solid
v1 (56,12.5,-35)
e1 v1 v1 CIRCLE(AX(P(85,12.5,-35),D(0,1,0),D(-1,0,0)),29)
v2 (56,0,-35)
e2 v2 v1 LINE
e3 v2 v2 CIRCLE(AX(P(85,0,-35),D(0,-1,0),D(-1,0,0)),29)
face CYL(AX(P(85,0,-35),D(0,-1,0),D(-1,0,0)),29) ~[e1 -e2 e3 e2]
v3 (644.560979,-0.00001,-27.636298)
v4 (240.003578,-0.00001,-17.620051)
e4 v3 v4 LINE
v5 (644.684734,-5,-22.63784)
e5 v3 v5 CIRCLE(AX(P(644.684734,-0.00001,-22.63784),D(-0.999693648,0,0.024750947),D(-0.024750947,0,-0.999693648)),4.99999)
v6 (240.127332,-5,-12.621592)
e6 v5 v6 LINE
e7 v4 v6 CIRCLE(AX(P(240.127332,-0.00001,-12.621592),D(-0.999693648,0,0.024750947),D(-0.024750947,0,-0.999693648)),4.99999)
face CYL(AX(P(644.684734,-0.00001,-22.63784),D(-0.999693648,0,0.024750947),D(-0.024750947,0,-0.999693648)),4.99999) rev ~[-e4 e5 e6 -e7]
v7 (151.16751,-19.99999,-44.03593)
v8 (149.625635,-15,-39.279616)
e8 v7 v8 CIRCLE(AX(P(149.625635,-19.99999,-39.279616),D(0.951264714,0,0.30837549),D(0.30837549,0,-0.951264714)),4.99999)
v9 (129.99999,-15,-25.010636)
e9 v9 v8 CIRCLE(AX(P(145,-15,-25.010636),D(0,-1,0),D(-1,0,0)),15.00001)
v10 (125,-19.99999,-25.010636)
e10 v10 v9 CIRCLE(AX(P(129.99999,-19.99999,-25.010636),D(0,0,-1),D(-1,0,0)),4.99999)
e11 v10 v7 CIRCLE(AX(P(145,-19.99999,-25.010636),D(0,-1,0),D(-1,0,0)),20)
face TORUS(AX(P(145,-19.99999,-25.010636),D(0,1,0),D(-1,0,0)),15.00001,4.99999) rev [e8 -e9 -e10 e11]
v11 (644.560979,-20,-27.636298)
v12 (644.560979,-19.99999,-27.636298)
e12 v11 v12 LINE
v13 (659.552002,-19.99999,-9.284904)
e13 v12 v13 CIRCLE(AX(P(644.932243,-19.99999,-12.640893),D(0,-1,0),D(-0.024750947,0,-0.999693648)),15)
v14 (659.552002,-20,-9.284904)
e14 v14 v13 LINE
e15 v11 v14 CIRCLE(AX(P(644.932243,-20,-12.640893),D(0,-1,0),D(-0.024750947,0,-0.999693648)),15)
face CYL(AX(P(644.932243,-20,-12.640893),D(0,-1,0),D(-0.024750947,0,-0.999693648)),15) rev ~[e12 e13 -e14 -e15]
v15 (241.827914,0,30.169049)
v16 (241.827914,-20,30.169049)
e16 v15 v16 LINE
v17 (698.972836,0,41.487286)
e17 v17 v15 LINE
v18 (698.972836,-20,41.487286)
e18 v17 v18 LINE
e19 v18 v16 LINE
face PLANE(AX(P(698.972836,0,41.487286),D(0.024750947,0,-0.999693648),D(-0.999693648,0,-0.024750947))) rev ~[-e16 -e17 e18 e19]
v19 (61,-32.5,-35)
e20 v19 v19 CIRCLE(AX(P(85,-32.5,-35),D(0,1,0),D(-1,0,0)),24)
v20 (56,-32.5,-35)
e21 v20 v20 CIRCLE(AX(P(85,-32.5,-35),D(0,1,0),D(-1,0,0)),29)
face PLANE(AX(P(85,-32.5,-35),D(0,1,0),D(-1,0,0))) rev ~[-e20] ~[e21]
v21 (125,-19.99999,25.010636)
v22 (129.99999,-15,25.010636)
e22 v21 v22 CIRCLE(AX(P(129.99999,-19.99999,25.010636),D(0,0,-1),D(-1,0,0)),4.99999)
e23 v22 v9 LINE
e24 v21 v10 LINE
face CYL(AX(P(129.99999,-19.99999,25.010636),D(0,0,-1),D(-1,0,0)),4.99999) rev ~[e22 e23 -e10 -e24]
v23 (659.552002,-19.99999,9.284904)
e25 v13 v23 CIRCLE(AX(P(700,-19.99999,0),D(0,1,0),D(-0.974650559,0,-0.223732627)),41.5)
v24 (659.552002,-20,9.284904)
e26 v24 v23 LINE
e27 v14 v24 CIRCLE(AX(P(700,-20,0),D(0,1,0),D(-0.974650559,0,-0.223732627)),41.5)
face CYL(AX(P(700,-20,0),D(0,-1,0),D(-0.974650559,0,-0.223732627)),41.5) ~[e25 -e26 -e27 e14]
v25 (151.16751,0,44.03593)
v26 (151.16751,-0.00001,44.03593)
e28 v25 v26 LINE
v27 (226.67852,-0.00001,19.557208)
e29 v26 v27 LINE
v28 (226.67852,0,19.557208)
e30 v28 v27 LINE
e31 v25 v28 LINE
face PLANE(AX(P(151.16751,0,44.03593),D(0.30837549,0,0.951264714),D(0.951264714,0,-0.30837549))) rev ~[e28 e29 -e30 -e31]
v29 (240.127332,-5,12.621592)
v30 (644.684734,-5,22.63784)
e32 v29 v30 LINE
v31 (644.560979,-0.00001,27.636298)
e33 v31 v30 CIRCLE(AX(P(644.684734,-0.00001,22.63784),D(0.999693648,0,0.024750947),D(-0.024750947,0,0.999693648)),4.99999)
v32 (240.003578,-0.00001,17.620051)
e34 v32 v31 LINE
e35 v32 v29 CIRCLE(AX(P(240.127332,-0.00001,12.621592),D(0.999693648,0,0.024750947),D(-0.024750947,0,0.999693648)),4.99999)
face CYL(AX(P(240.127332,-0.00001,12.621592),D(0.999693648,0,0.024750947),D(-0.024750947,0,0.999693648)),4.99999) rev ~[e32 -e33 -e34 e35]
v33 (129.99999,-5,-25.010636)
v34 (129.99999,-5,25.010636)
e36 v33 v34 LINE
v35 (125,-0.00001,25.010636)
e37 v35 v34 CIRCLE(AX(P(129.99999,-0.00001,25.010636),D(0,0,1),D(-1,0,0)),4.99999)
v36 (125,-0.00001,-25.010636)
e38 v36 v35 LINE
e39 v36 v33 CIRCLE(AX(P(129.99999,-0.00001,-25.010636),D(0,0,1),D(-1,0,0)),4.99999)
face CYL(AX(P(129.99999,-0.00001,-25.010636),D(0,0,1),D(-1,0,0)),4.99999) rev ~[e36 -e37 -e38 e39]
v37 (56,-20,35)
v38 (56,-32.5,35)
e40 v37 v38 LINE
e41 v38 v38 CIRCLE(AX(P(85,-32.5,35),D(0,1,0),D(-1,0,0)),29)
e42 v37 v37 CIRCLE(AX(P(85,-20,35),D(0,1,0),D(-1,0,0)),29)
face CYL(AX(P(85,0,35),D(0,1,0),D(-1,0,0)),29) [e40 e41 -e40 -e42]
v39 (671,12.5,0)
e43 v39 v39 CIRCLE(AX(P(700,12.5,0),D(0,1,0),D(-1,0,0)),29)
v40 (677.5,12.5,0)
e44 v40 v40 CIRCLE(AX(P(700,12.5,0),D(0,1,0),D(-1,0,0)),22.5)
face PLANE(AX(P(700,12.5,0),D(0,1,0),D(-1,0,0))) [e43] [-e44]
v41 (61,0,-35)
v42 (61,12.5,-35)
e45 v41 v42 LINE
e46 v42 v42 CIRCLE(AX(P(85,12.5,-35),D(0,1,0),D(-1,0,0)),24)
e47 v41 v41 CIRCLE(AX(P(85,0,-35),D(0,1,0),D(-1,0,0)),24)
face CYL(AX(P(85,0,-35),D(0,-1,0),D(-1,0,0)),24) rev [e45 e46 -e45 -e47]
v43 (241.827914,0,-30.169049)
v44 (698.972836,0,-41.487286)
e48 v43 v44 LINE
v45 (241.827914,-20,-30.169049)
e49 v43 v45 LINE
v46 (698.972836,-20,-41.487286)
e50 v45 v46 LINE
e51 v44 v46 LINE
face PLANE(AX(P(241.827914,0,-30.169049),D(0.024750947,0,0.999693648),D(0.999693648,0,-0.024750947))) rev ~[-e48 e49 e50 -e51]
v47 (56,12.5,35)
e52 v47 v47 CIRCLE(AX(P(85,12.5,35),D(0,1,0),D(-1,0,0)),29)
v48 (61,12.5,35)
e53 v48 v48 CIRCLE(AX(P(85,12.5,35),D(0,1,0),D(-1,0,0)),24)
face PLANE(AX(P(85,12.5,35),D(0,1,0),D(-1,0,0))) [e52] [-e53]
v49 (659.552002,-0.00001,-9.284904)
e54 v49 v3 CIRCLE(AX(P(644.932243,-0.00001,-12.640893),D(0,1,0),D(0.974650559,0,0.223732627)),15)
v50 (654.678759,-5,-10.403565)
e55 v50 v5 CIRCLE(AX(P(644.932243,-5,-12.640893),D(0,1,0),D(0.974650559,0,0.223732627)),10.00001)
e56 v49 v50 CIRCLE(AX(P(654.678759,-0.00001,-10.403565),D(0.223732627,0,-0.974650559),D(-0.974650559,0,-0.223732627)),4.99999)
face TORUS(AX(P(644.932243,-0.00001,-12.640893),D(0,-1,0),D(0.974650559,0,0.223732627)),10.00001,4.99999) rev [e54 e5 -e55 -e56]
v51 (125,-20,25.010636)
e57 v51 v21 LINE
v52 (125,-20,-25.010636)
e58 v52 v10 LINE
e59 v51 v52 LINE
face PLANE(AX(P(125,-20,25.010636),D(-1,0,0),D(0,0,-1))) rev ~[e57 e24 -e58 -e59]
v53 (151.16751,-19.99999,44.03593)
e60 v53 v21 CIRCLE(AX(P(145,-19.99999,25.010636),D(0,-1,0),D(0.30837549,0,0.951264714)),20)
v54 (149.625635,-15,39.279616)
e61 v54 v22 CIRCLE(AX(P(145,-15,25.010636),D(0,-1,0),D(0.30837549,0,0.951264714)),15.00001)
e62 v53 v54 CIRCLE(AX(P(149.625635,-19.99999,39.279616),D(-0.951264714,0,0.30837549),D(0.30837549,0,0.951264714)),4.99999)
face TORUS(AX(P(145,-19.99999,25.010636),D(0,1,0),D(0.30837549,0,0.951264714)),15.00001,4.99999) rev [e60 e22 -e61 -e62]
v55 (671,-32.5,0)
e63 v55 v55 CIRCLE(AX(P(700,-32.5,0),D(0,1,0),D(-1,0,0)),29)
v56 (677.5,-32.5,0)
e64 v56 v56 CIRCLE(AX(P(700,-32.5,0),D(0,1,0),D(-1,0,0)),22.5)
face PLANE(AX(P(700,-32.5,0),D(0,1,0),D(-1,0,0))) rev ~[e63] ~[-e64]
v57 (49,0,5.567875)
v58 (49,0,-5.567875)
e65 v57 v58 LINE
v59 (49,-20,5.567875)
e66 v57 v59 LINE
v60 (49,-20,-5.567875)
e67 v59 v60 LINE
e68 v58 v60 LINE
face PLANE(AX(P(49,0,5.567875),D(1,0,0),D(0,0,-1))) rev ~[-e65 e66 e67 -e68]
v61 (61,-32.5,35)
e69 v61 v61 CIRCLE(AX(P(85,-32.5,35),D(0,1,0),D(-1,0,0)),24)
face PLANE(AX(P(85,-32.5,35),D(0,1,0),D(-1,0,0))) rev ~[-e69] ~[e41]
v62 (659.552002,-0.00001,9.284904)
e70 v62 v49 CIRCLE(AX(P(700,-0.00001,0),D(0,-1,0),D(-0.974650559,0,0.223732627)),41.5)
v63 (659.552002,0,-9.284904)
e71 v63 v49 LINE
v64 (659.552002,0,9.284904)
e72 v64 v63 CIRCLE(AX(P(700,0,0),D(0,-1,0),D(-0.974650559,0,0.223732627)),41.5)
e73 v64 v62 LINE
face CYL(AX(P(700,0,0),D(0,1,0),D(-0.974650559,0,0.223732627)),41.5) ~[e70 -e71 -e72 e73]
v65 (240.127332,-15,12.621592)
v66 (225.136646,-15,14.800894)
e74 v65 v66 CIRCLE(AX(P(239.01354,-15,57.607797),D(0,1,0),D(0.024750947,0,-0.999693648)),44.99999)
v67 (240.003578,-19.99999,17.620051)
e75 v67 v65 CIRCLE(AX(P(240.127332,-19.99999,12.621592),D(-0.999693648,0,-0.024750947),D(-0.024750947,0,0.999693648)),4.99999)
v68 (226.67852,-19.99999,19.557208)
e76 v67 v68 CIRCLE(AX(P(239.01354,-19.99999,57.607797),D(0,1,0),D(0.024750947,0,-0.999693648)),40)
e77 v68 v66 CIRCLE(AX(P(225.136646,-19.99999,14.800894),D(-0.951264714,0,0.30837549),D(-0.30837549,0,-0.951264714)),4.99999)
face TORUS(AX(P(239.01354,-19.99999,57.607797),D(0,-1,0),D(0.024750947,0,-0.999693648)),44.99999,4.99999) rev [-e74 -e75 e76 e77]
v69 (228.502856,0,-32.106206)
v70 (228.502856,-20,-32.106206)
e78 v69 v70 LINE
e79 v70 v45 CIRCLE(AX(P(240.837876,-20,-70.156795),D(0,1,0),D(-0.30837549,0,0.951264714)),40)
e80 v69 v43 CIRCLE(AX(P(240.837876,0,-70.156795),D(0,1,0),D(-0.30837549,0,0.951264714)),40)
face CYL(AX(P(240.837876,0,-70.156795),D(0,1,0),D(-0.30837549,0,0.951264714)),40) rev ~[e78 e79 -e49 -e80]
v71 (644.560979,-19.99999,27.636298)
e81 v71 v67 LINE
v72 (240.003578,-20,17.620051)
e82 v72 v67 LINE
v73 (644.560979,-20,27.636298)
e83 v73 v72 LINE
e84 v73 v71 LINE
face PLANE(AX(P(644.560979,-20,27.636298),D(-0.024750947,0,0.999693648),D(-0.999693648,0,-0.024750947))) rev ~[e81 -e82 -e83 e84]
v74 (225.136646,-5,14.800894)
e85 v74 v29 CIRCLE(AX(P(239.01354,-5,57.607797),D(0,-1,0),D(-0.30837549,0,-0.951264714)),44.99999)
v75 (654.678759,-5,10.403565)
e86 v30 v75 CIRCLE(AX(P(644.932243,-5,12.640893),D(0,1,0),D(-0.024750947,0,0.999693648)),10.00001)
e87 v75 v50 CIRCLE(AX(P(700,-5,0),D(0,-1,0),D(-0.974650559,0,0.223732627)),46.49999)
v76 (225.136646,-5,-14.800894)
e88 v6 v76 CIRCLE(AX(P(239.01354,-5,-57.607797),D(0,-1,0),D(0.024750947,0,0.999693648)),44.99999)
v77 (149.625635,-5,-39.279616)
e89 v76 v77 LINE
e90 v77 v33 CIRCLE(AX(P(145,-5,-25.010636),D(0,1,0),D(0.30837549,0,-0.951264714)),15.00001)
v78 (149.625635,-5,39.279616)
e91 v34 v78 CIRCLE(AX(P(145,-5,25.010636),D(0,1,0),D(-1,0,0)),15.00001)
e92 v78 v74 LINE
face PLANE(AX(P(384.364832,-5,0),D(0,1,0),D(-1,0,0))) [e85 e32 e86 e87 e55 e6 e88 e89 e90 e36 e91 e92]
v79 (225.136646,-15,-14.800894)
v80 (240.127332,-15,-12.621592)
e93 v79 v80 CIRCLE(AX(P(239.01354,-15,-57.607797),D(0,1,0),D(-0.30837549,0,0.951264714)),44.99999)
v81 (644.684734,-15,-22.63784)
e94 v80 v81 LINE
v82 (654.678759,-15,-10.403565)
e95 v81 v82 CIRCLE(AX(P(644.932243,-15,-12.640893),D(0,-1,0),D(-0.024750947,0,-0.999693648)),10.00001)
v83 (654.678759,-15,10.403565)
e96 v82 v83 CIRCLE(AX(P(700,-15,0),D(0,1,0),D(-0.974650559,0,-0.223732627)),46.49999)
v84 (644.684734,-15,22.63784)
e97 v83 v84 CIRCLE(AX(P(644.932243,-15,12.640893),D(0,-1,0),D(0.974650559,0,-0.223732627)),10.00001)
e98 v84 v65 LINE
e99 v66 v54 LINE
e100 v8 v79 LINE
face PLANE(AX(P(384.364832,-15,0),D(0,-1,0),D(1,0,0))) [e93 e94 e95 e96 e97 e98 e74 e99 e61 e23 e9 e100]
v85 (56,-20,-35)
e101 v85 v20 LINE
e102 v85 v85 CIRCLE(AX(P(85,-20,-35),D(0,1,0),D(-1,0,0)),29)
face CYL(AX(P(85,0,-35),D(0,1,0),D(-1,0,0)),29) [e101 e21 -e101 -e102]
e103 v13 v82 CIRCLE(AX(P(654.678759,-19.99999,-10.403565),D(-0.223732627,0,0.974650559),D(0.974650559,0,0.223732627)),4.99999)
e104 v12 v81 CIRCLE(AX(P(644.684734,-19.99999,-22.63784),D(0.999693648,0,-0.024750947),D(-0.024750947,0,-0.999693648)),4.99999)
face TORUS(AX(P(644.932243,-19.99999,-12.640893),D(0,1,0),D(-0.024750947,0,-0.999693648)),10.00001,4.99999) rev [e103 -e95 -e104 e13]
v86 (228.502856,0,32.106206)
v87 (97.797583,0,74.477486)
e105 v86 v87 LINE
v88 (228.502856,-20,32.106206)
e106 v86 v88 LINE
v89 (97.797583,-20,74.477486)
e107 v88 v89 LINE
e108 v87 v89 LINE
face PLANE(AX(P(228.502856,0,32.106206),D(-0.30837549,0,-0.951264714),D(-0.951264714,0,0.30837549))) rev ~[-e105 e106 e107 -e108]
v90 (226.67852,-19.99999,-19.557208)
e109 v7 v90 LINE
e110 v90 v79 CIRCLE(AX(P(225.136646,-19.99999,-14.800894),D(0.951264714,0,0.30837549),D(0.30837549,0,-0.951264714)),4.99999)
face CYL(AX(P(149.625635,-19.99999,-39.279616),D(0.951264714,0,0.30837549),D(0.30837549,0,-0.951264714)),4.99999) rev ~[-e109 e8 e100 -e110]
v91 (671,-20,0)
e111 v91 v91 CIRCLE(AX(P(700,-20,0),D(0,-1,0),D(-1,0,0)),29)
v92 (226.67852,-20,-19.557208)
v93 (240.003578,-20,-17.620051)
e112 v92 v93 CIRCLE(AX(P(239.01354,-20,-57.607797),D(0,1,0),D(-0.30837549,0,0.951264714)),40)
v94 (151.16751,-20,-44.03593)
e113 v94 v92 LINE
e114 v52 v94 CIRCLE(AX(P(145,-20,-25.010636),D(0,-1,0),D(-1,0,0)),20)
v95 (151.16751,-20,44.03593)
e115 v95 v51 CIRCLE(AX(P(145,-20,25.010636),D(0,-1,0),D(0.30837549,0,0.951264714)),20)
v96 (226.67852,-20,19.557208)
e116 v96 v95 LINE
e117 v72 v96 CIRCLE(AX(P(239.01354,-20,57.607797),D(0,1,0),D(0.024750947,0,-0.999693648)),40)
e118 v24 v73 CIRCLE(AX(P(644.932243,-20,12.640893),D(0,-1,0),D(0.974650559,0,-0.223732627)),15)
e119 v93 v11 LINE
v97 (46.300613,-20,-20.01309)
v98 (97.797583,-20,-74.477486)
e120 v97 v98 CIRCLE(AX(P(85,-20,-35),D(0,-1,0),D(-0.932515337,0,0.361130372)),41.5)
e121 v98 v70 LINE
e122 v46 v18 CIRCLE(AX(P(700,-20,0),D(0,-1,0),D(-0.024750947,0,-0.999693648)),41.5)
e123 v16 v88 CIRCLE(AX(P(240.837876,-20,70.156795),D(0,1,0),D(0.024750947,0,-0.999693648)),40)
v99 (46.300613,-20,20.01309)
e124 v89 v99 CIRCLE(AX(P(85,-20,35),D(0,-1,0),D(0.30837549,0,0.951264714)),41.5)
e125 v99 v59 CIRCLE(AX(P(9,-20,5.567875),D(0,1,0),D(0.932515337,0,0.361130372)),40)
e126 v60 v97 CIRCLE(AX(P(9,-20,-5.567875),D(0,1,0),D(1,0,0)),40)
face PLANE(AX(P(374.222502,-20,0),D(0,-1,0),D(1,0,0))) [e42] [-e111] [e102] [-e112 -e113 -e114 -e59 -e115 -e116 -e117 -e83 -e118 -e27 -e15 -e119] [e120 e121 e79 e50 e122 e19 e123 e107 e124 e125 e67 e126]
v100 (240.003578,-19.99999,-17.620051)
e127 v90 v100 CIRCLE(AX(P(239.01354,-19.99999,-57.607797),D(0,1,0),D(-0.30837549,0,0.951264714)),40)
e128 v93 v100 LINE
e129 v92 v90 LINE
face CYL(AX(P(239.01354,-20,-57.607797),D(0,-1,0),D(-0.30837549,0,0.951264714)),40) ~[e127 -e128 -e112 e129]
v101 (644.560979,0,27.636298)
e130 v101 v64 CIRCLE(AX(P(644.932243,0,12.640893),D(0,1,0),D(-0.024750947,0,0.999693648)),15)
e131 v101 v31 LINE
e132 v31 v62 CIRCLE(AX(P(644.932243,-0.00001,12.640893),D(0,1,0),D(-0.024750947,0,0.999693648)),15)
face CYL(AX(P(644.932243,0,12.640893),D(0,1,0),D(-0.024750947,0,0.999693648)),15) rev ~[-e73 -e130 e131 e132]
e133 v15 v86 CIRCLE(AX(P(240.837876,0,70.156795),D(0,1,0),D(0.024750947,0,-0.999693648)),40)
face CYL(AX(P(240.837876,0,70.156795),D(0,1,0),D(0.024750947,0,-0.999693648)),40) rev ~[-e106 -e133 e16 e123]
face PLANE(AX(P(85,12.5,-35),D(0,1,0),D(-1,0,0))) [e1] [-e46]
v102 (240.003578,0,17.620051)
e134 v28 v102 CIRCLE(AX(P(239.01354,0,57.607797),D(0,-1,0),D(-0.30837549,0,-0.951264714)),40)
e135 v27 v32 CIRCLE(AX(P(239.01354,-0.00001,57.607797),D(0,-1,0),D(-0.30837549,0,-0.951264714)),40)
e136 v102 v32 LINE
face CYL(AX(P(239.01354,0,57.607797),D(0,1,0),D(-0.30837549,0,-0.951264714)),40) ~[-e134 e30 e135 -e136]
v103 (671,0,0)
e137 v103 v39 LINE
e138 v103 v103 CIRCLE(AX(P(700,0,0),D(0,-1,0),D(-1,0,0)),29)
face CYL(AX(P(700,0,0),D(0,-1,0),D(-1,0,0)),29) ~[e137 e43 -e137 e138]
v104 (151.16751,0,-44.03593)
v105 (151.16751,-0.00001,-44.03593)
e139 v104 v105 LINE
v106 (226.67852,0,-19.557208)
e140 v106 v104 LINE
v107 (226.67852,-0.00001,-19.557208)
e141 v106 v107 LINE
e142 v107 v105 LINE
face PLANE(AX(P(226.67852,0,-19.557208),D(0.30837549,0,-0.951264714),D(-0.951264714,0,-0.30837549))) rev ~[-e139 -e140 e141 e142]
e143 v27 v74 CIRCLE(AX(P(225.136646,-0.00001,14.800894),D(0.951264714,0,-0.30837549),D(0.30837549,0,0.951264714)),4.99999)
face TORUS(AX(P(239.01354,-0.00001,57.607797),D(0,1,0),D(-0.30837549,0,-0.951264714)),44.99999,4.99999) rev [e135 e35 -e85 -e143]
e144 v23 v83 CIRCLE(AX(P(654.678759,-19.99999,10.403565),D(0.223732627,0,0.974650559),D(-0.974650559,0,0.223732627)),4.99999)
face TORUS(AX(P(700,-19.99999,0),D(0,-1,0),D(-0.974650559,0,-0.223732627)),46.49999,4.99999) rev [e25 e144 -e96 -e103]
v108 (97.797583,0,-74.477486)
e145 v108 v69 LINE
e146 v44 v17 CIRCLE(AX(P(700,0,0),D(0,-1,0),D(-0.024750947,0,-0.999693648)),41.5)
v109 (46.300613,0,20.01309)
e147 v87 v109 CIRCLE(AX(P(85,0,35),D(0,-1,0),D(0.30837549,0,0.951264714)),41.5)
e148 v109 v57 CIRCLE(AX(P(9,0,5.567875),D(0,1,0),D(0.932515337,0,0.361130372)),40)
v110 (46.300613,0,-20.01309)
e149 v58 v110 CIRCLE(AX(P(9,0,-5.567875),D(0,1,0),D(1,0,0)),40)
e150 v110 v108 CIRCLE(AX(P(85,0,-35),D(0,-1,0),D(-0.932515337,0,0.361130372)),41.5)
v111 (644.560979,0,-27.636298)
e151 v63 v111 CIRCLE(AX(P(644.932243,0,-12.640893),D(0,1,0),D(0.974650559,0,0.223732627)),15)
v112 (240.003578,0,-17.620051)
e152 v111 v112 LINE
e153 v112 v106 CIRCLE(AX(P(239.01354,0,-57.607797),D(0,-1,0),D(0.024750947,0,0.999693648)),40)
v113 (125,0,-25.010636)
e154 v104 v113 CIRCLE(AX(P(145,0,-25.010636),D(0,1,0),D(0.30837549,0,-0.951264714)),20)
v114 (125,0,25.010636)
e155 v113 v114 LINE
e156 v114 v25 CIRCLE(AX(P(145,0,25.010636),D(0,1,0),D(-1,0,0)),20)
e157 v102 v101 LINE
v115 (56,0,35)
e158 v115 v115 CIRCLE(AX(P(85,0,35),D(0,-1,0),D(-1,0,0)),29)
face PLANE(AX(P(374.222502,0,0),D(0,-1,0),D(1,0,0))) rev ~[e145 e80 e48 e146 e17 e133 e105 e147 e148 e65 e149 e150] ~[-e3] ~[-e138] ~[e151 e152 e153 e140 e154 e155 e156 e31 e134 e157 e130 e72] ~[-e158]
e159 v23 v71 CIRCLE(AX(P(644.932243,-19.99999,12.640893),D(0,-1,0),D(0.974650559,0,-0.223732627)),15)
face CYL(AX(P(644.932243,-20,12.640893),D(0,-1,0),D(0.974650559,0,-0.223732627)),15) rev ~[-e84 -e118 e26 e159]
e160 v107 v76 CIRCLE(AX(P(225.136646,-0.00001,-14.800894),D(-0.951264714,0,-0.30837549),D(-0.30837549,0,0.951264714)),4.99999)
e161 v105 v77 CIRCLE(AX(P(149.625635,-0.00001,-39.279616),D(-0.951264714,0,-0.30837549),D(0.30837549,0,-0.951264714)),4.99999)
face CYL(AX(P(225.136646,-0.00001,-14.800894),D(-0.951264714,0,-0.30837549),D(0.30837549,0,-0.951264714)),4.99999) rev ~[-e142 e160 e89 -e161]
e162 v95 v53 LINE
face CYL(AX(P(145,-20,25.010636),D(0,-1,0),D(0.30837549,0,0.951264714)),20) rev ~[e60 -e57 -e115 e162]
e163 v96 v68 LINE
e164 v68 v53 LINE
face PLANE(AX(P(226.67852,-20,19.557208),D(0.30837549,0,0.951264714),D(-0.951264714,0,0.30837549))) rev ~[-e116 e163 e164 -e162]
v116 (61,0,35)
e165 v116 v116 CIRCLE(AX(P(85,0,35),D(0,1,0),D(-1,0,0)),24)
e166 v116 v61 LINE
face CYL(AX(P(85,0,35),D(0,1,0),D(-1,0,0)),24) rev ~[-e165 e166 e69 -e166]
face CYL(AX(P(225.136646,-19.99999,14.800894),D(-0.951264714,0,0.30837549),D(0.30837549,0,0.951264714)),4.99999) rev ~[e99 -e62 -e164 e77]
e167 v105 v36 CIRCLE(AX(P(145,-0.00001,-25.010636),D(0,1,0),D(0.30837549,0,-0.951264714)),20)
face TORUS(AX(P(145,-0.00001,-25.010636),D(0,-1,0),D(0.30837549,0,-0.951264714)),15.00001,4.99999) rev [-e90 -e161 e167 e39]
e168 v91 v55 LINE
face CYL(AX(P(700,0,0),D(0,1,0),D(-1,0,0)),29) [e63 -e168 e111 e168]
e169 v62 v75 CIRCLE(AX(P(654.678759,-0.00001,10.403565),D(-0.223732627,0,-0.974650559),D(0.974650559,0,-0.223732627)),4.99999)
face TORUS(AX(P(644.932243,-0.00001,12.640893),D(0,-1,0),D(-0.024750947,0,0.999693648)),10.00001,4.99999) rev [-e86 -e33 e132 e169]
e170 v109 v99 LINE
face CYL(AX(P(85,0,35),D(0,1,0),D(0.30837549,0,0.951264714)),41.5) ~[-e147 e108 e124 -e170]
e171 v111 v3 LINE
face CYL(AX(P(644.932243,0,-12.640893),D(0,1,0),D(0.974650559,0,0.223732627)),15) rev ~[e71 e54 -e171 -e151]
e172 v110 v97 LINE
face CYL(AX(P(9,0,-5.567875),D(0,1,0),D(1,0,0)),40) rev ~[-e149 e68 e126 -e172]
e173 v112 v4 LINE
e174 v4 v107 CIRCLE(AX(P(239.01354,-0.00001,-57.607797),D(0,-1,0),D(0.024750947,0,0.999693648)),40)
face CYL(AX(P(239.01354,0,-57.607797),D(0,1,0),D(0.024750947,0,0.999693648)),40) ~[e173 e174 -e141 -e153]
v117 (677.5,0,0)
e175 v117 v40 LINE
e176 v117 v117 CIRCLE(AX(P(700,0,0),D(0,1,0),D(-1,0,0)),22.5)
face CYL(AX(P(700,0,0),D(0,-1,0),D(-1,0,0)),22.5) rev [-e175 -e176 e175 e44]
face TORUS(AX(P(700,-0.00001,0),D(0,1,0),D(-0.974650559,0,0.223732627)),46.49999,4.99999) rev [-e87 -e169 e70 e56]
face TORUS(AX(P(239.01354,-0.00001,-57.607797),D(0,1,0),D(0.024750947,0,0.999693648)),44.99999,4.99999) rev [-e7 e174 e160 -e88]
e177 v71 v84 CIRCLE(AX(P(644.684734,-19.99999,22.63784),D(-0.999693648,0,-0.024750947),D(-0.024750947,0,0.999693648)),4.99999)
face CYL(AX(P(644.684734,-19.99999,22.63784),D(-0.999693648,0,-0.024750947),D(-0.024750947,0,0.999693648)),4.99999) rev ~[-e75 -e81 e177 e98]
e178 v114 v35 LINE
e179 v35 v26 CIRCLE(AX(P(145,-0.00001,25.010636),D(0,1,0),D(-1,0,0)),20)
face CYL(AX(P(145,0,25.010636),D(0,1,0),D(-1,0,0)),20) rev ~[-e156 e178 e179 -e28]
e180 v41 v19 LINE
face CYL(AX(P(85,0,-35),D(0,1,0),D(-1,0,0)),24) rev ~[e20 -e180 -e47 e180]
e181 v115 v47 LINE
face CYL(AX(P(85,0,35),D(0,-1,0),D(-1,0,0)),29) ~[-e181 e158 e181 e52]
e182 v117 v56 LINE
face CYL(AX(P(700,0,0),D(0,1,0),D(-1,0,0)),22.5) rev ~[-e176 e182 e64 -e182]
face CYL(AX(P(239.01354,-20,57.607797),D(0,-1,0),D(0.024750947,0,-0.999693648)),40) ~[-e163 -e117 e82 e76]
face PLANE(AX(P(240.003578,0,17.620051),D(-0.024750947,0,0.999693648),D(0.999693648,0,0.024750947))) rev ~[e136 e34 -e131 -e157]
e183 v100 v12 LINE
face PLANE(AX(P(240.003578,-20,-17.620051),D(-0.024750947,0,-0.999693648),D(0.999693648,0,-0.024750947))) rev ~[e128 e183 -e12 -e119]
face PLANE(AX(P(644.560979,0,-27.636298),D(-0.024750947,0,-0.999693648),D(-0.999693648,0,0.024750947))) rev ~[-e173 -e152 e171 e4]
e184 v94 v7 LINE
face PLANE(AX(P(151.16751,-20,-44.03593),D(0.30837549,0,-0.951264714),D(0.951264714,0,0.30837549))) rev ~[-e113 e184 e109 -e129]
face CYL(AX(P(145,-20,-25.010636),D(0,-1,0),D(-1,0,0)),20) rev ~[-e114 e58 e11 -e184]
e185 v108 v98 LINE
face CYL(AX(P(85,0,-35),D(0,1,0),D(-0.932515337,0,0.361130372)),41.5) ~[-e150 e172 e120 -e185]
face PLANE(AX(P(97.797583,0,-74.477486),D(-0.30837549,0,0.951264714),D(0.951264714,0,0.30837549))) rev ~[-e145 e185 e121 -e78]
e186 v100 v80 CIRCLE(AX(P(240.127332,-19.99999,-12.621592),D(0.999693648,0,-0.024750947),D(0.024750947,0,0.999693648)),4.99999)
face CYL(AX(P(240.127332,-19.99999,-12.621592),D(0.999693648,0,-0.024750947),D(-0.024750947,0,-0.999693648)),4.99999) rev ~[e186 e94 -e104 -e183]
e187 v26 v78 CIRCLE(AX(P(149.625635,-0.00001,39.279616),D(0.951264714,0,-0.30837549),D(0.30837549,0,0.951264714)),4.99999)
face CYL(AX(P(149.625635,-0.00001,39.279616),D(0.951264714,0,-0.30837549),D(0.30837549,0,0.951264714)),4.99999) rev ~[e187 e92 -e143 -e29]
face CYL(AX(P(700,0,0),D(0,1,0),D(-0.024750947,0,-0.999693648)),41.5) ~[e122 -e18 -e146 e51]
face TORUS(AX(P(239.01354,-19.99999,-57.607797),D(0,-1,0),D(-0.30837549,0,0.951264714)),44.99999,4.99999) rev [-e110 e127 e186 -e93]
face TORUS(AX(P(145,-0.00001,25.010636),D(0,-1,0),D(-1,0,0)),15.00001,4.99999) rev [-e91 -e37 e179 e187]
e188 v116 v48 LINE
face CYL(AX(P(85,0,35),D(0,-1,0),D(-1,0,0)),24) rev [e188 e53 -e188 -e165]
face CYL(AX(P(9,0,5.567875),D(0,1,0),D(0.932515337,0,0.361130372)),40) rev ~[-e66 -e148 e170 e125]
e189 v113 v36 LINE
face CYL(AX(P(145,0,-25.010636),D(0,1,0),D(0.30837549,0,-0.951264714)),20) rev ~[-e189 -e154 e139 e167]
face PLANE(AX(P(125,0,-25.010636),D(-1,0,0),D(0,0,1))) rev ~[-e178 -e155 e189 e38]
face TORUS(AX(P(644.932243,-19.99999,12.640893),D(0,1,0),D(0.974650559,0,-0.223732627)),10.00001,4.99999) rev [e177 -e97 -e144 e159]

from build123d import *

# Parameters (mm, degrees)
F0_R          = 29
F1_DEPTH      = 20
F3_DEPTH      = 5
F5_DEPTH      = 5
F6_R          = 4.99999
F7_R          = 4.99999
F8_R          = 29
F8_R_2        = 22.5
F8_R_3        = 24
F9_DEPTH      = 12.5
F9_DEPTH_BACK = 32.5


# Not quite as in the source:
# - a fillet or chamfer is up to 0.001 mm smaller than in the source, because OpenCascade refuses the exact size


with BuildPart() as f1:
    # F0 (on Front) → F1 (new body)
    with BuildSketch(Plane.XZ):
        with BuildLine():
            Line((228.5028561992, 32.1062064806), (97.7975828549, 74.4774856478))
            ThreePointArc((97.7975828549, 74.4774856478), (54.8450921386, 63.5119541924), (46.3006134969, 20.0130895684))
            ThreePointArc((46.3006134969, 20.0130895684), (48.3193625322, 12.9155090118), (49, 5.5678746945))
            Line((49, 5.5678746945), (49, -5.5678746945))
            ThreePointArc((49, -5.5678746945), (48.3193625322, -12.9155090118), (46.3006134969, -20.0130895684))
            ThreePointArc((46.3006134969, -20.0130895684), (54.8450921386, -63.5119541924), (97.7975828549, -74.4774856478))
            Line((97.7975828549, -74.4774856478), (228.5028561992, -32.1062064806))
            ThreePointArc((228.5028561992, -32.1062064806), (235.0832865864, -30.5729005697), (241.8279137151, -30.1690491218))
            Line((241.8279137151, -30.1690491218), (698.9728356822, -41.4872864076))
            ThreePointArc((698.9728356822, -41.4872864076), (741.5, 0), (698.9728356822, 41.4872864076))
            Line((698.9728356822, 41.4872864076), (241.8279137151, 30.1690491218))
            ThreePointArc((241.8279137151, 30.1690491218), (235.0832865864, 30.5729005697), (228.5028561992, 32.1062064806))
        make_face()
        with Locations((85, -35)):
            Circle(F0_R, mode=Mode.SUBTRACT)
        with Locations((85, 35)):
            Circle(F0_R, mode=Mode.SUBTRACT)
        with Locations((700, 0)):
            Circle(F0_R, mode=Mode.SUBTRACT)
    extrude(amount=F1_DEPTH)

    # F2 (on face) → F3 (cut)
    with BuildSketch(Plane.XZ.offset(20)):
        with BuildLine():
            ThreePointArc((659.5520018106, -9.2849040098), (658.5, 0), (659.5520018106, 9.2849040098))
            ThreePointArc((659.5520018106, 9.2849040098), (656.5489690059, 22.1304501377), (644.5609792177, 27.6362981366))
            Line((644.5609792177, 27.6362981366), (240.0035775219, 17.6200506665))
            ThreePointArc((240.0035775219, 17.6200506665), (233.2589503932, 18.0239021144), (226.678520006, 19.5572080254))
            Line((226.678520006, 19.5572080254), (151.1675098096, 44.0359303551))
            ThreePointArc((151.1675098096, 44.0359303551), (133.238839262, 41.1870107565), (125, 25.010636067))
            Line((125, 25.010636067), (125, -25.010636067))
            ThreePointArc((125, -25.010636067), (133.238839262, -41.1870107565), (151.1675098096, -44.0359303551))
            Line((151.1675098096, -44.0359303551), (226.678520006, -19.5572080254))
            ThreePointArc((226.678520006, -19.5572080254), (233.2589503932, -18.0239021144), (240.0035775219, -17.6200506665))
            Line((240.0035775219, -17.6200506665), (644.5609792177, -27.6362981366))
            ThreePointArc((644.5609792177, -27.6362981366), (656.5489690059, -22.1304501377), (659.5520018106, -9.2849040098))
        make_face()
    extrude(amount=-F3_DEPTH, mode=Mode.SUBTRACT)

    # F4 (on face) → F5 (cut)
    with BuildSketch(Plane(origin=(0, 0, 0), x_dir=(-1, 0, 0), z_dir=(0, 1, 0))):
        with BuildLine():
            ThreePointArc((-659.5520018106, 9.2849040098), (-658.5, 0), (-659.5520018106, -9.2849040098))
            ThreePointArc((-659.5520018106, -9.2849040098), (-656.5489690059, -22.1304501377), (-644.5609792177, -27.6362981366))
            Line((-644.5609792177, -27.6362981366), (-240.0035775219, -17.6200506665))
            ThreePointArc((-240.0035775219, -17.6200506665), (-233.2589503932, -18.0239021144), (-226.678520006, -19.5572080254))
            Line((-226.678520006, -19.5572080254), (-151.1675098096, -44.0359303551))
            ThreePointArc((-151.1675098096, -44.0359303551), (-133.238839262, -41.1870107565), (-125, -25.010636067))
            Line((-125, -25.010636067), (-125, 25.010636067))
            ThreePointArc((-125, 25.010636067), (-133.238839262, 41.1870107565), (-151.1675098096, 44.0359303551))
            Line((-151.1675098096, 44.0359303551), (-226.678520006, 19.5572080254))
            ThreePointArc((-226.678520006, 19.5572080254), (-233.2589503932, 18.0239021144), (-240.0035775219, 17.6200506665))
            Line((-240.0035775219, 17.6200506665), (-644.5609792177, 27.6362981366))
            ThreePointArc((-644.5609792177, 27.6362981366), (-656.5489690059, 22.1304501377), (-659.5520018106, 9.2849040098))
        make_face()
    extrude(amount=-F5_DEPTH, mode=Mode.SUBTRACT)

    # F6 (radius 5 in the source; OpenCascade refuses exactly that, so slightly less here)
    f6_edges = [f1.edges().sort_by_distance(p)[0] for p in [
        (442.282278, -15, 22.628174),
    ]]
    fillet(f6_edges, radius=F6_R)

    # F7 (radius 5 in the source; OpenCascade refuses exactly that, so slightly less here)
    f7_edges = [f1.edges().sort_by_distance(p)[0] for p in [
        (442.282278, -5, 22.628174),
    ]]
    fillet(f7_edges, radius=F7_R)

    # F8 (on face) → F9 (join, two sides)
    with BuildSketch(Plane(origin=(0, 0, 0), x_dir=(-1, 0, 0), z_dir=(0, 1, 0))) as f9_sk:
        with Locations((-700, 0)):
            Circle(F8_R)
        with Locations((-700, 0)):
            Circle(F8_R_2, mode=Mode.SUBTRACT)
        with Locations((-85, 35)):
            Circle(F8_R)
        with Locations((-85, 35)):
            Circle(F8_R_3, mode=Mode.SUBTRACT)
        with Locations((-85, -35)):
            Circle(F8_R)
        with Locations((-85, -35)):
            Circle(F8_R_3, mode=Mode.SUBTRACT)
    extrude(amount=F9_DEPTH)
    extrude(f9_sk.sketch, amount=-F9_DEPTH_BACK)


solid = f1.part
